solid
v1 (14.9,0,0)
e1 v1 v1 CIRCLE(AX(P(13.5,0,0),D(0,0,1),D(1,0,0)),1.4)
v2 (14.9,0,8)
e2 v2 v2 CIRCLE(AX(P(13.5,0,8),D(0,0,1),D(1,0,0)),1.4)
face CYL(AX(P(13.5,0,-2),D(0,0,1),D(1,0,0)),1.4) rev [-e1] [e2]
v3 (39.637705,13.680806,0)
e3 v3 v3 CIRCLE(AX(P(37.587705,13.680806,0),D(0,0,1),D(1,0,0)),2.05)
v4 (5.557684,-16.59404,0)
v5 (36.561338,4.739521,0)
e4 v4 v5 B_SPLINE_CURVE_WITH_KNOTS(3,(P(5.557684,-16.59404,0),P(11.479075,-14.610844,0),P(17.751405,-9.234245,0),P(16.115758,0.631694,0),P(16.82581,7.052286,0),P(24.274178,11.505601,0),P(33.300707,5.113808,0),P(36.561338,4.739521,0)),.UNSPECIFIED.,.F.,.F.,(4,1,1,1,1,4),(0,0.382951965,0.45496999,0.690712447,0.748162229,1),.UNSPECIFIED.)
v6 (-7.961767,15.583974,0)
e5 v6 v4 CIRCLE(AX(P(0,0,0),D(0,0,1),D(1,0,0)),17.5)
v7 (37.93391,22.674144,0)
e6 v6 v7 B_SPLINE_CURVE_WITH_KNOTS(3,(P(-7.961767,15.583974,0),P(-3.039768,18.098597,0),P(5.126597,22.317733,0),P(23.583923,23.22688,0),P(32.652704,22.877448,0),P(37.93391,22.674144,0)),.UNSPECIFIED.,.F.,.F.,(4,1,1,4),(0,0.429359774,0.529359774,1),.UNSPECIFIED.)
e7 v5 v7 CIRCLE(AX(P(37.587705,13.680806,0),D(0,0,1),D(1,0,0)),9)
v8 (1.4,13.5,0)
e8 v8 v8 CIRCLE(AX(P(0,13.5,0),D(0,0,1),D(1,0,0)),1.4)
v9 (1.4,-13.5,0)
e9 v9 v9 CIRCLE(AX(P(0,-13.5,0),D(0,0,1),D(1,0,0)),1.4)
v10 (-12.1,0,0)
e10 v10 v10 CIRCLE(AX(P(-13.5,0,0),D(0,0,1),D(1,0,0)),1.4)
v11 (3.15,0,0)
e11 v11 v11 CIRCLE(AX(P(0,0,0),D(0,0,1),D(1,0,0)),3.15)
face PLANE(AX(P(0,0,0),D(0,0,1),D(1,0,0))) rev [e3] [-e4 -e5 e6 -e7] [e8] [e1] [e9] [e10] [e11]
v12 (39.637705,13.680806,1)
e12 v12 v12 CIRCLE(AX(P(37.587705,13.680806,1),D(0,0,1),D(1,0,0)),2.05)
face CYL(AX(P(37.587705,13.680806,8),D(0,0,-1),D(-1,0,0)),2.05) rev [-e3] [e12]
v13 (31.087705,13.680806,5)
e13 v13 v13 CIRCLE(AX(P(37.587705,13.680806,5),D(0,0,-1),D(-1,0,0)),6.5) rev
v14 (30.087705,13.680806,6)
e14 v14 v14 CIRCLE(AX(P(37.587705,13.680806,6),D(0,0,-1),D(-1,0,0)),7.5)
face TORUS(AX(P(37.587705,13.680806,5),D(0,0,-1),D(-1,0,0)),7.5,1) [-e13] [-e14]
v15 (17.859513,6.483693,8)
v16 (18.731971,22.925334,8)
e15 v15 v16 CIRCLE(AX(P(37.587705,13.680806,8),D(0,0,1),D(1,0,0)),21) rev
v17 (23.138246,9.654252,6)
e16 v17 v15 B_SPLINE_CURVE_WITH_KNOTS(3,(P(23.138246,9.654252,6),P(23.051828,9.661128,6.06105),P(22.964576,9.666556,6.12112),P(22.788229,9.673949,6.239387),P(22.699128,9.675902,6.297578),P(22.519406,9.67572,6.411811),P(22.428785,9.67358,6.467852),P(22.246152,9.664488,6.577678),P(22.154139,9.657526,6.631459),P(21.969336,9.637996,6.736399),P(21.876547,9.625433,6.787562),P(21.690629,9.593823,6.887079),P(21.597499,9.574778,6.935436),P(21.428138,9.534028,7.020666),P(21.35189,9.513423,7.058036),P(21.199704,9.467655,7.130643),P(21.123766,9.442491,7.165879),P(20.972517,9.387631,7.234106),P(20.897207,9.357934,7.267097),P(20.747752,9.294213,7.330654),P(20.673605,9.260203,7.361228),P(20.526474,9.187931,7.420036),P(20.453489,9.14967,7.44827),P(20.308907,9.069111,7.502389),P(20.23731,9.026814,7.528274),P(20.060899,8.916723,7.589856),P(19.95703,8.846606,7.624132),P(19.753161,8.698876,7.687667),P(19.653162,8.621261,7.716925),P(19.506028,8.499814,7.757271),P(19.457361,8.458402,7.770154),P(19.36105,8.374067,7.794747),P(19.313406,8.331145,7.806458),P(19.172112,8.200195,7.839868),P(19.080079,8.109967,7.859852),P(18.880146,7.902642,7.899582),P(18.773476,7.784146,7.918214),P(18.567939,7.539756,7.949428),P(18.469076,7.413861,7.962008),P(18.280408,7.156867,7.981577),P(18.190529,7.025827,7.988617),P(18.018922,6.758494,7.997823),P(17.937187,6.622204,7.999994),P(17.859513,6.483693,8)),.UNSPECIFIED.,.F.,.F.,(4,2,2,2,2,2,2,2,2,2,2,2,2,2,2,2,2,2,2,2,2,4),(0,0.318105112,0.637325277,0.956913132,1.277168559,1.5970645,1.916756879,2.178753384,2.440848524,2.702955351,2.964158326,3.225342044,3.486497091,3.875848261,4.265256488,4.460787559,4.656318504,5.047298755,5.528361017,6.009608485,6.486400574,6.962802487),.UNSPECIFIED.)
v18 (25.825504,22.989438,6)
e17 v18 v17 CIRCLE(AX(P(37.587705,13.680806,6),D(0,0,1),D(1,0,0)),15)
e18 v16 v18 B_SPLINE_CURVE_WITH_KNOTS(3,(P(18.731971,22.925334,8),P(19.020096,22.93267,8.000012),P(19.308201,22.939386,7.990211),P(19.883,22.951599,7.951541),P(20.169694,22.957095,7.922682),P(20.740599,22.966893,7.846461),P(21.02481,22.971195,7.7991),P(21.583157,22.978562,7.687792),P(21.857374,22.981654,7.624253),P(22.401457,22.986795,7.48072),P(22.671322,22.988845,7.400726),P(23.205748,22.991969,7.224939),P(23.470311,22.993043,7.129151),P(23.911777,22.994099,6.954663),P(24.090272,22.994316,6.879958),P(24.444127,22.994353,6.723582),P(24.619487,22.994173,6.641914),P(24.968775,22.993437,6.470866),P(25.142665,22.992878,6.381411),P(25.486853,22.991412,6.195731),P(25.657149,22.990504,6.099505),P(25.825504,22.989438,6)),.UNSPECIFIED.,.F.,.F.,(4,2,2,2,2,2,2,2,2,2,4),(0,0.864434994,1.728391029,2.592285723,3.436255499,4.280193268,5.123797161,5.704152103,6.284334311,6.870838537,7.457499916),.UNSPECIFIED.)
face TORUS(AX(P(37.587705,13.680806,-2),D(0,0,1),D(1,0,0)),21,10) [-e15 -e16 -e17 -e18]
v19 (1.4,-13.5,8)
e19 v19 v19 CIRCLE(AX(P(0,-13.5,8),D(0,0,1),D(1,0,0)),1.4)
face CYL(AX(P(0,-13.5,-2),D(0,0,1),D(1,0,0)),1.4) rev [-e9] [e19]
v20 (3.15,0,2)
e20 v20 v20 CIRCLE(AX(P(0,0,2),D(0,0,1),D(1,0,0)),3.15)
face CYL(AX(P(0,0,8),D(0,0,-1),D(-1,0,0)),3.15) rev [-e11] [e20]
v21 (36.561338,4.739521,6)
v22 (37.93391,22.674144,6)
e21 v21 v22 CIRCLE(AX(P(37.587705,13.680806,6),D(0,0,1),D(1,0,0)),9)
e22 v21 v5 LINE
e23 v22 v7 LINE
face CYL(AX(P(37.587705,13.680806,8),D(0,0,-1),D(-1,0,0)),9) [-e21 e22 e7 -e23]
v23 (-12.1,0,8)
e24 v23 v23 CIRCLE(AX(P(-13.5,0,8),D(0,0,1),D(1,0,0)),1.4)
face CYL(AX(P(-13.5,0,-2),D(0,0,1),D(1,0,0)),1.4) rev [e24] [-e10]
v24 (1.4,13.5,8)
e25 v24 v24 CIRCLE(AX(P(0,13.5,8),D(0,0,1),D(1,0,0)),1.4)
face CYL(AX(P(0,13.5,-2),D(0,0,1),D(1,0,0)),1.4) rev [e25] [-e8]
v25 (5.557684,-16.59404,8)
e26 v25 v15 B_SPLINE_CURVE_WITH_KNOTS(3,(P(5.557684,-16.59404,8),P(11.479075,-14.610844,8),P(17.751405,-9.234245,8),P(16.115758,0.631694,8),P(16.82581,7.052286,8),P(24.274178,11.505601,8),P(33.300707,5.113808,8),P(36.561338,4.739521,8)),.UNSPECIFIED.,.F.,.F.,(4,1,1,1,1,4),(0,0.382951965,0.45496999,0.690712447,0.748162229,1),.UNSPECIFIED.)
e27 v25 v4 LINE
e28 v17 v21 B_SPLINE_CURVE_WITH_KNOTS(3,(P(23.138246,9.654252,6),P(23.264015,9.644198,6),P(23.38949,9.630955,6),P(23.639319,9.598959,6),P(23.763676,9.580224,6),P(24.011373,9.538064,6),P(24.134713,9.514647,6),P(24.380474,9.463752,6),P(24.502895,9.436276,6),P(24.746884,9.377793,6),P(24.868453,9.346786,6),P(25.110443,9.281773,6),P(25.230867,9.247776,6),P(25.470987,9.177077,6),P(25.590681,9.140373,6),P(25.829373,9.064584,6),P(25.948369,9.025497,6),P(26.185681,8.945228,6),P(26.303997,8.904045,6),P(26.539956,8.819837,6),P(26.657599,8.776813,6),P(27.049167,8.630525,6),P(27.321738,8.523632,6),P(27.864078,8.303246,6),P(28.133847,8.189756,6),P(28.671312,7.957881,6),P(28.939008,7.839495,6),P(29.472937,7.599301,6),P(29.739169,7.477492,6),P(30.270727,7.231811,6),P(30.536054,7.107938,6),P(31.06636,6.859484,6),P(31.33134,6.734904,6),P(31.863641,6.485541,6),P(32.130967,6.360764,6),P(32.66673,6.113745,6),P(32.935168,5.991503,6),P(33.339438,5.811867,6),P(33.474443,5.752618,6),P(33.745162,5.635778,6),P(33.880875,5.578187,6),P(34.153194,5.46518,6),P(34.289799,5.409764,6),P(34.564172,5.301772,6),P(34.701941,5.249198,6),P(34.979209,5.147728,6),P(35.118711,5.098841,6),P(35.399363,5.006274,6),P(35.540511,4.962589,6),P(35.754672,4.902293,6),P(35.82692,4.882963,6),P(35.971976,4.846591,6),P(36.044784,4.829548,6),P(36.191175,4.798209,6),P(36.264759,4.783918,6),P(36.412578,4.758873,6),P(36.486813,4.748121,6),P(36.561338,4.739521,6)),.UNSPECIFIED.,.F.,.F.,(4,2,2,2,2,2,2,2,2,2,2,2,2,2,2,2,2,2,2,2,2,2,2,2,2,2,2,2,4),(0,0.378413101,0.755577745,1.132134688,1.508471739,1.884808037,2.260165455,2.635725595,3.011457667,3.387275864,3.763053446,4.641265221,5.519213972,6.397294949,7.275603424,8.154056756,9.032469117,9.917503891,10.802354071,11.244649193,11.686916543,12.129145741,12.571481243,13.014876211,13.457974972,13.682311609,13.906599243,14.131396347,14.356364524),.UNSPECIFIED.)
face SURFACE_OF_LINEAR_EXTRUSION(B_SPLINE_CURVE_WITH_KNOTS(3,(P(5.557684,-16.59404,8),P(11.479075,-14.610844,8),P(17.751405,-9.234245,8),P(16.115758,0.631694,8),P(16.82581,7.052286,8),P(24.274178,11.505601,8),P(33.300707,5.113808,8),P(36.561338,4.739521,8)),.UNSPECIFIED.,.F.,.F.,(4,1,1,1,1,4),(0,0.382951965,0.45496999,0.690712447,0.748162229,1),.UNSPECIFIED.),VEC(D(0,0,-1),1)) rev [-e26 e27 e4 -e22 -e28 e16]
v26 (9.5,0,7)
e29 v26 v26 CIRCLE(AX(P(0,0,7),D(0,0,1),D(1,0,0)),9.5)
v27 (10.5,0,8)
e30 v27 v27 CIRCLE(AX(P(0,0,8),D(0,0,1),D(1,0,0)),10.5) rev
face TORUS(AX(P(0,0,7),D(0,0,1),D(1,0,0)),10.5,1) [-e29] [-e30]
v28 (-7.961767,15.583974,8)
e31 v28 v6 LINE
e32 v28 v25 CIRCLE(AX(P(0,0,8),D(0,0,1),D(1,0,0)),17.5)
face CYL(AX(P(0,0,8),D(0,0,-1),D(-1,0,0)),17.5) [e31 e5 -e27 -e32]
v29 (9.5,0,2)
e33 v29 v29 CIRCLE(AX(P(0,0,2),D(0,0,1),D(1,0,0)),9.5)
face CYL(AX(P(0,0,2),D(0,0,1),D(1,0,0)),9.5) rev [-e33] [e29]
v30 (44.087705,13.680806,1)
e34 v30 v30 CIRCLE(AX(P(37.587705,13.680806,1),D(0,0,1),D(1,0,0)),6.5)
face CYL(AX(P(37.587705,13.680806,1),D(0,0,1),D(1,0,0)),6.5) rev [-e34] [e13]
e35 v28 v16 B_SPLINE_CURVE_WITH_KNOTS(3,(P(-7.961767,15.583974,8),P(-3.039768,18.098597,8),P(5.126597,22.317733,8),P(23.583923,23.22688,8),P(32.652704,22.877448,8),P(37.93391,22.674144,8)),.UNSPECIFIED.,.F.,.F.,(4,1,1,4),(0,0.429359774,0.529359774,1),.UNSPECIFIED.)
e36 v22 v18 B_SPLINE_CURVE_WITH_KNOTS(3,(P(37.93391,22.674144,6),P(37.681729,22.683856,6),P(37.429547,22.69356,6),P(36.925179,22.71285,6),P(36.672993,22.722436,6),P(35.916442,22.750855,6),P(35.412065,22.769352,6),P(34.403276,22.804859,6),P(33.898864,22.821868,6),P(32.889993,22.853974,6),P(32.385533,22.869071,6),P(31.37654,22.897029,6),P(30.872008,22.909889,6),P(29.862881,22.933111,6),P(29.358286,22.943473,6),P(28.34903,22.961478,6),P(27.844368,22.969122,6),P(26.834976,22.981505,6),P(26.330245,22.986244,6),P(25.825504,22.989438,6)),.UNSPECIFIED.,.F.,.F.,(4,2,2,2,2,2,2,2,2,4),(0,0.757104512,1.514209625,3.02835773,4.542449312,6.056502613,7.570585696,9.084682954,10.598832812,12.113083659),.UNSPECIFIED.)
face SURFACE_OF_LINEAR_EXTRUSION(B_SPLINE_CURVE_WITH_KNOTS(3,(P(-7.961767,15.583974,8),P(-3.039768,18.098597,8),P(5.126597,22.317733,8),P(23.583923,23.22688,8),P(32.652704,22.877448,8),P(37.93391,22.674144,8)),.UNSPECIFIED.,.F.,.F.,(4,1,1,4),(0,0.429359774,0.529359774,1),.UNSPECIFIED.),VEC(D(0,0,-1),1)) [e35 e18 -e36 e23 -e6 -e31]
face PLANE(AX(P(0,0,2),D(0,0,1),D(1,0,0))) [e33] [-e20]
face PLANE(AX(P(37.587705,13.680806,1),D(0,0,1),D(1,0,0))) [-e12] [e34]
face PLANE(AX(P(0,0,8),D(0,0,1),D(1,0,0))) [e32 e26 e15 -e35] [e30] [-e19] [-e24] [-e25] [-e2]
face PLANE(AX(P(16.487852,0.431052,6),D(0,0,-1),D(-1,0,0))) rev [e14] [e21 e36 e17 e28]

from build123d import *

# Parameters (mm, degrees)
SKETCH1_R           = 6.5
SKETCH1_R_2         = 9.5
SKETCH1_R_3         = 3.15
SKETCH1_R_4         = 2.05
BOSS_EXTRUDE1_DEPTH = 8
SKETCH2_R           = 1.4
CUT_EXTRUDE1_DEPTH  = 10
SKETCH3_R           = 9.5
CUT_EXTRUDE2_DEPTH  = 6
CUT_EXTRUDE3_START  = -2
CUT_EXTRUDE3_DEPTH  = 2
SKETCH6_R           = 6.5
CUT_EXTRUDE4_DEPTH  = 5
FILLET1_R           = 10
FILLET3_R           = 1
FILLET4_R           = 1


with BuildPart() as part:
    # Sketch1 → Boss-Extrude1 (new body)
    # profile 1 of 3: a face of its own
    with BuildSketch(Plane.XY):
        with BuildLine():
            ThreePointArc((-7.96176738, 15.583974467), (-16.133848008, -6.77856537), (5.557683878, -16.59403959))
            add(Edge.make_bspline(
                [(5.557683878, -16.59403959), (11.479074635, -14.610844493), (17.751405143, -9.234245164), (16.115757619, 0.631694436), (16.825810009, 7.052286054), (24.274178409, 11.505601391), (33.300706558, 5.113807946), (36.561337581, 4.739521135)],
                knots=[0, 0, 0, 0, 0.382951965, 0.45496999, 0.690712447, 0.748162229, 1, 1, 1, 1], degree=3))
            ThreePointArc((36.561337581, 4.739521135), (46.561462901, 12.994026209), (37.933909918, 22.674144492))
            add(Edge.make_bspline(
                [(-7.96176738, 15.583974467), (-3.039767553, 18.098597277), (5.12659712, 22.317732547), (23.583922654, 23.226880319), (32.652703513, 22.877448356), (37.933909918, 22.674144492)],
                knots=[0, 0, 0, 0, 0.429359774, 0.529359774, 1, 1, 1, 1], degree=3))
        make_face()
        with Locations((37.587704831, 13.680805733)):
            Circle(SKETCH1_R, mode=Mode.SUBTRACT)
        Circle(SKETCH1_R_2, mode=Mode.SUBTRACT)
    # profile 2 of 3: a face of its own
    with BuildSketch(Plane.XY):
        Circle(SKETCH1_R_2)
        Circle(SKETCH1_R_3, mode=Mode.SUBTRACT)
    # profile 3 of 3: a face of its own
    with BuildSketch(Plane.XY):
        with Locations((37.587704831, 13.680805733)):
            Circle(SKETCH1_R)
        with Locations((37.587704831, 13.680805733)):
            Circle(SKETCH1_R_4, mode=Mode.SUBTRACT)
    extrude(amount=BOSS_EXTRUDE1_DEPTH)

    # Sketch2 → Cut-Extrude1 (cut)
    with BuildSketch(Plane.XY.offset(8)):
        with Locations((0, 13.5)):
            Circle(SKETCH2_R)
        with Locations((13.5, 0)):
            Circle(SKETCH2_R)
        with Locations((0, -13.5)):
            Circle(SKETCH2_R)
        with Locations((-13.5, 0)):
            Circle(SKETCH2_R)
    extrude(amount=-CUT_EXTRUDE1_DEPTH, mode=Mode.SUBTRACT)

    # Sketch3 → Cut-Extrude2 (cut)
    with BuildSketch(Plane.XY.offset(8)):
        Circle(SKETCH3_R)
    extrude(amount=-CUT_EXTRUDE2_DEPTH, mode=Mode.SUBTRACT)

    # Sketch5 → Cut-Extrude3 (cut)
    with BuildSketch(Plane.XY.offset(8).offset(CUT_EXTRUDE3_START)):
        with BuildLine():
            ThreePointArc((25.825503891, 22.989437697), (22.883298202, 16.643984039), (23.138245926, 9.654251705))
            add(Edge.make_bspline(
                [(23.138245926, 9.654251705), (27.396044405, 9.314768535), (33.630557167, 5.075944498), (36.561337581, 4.739521135)],
                knots=[0.773638537, 0.773638537, 0.773638537, 0.773638537, 1, 1, 1, 1], degree=3))
            ThreePointArc((36.561337581, 4.739521135), (46.561462901, 12.994026209), (37.933909918, 22.674144492))
            add(Edge.make_bspline(
                [(37.933909918, 22.674144492), (34.650963076, 22.800523908), (30.51852808, 22.959707824), (25.825503891, 22.989437697)],
                knots=[0, 0, 0, 0, 0.292563237, 0.292563237, 0.292563237, 0.292563237], degree=3))
        make_face()
    extrude(amount=CUT_EXTRUDE3_DEPTH, mode=Mode.SUBTRACT)

    # Sketch6 → Cut-Extrude4 (cut)
    with BuildSketch(Plane.XY.offset(6)):
        with Locations((37.587704831, 13.680805733)):
            Circle(SKETCH6_R)
    extrude(amount=-CUT_EXTRUDE4_DEPTH, mode=Mode.SUBTRACT)

    # Fillet1
    # the kernel refuses this fillet: 10 mm, written as the material it takes off along each edge
    with BuildSketch(Plane(origin=(37.587704831, 13.680805733, 8), x_dir=(0.09866346978303978, 0.9951208568462281, 0), z_dir=(0.9951208568462281, -0.09866346978303978, 0))) as fillet1_piece_1:
        with BuildLine():
            CenterArc((21, -10), FILLET1_R, 90, 36.869897646)
            Line((21, 0), (21, 0.2))
            Line((21, 0.2), (15, 0.2))
            Line((15, 0.2), (14.8, 0))
            ThreePointArc((14.8, 0), (14.8, -1), (14.88, -1.84))
            Line((14.88, -1.84), (15, -2))
        make_face()
    revolve(axis=Axis((37.587704831, 13.680805733, 8), (0, 0, 1)), revolution_arc=168.537531078, mode=Mode.SUBTRACT)

    # Fillet3
    fillet3_edges = [part.edges().sort_by_distance(p)[0] for p in [
        (31.087704831, 13.680805733, 6),
    ]]
    fillet(fillet3_edges, radius=FILLET3_R)

    # Fillet4
    fillet4_edges = [part.edges().sort_by_distance(p)[0] for p in [
        (-9.5, 0, 8),
    ]]
    fillet(fillet4_edges, radius=FILLET4_R)


solid = part.part
